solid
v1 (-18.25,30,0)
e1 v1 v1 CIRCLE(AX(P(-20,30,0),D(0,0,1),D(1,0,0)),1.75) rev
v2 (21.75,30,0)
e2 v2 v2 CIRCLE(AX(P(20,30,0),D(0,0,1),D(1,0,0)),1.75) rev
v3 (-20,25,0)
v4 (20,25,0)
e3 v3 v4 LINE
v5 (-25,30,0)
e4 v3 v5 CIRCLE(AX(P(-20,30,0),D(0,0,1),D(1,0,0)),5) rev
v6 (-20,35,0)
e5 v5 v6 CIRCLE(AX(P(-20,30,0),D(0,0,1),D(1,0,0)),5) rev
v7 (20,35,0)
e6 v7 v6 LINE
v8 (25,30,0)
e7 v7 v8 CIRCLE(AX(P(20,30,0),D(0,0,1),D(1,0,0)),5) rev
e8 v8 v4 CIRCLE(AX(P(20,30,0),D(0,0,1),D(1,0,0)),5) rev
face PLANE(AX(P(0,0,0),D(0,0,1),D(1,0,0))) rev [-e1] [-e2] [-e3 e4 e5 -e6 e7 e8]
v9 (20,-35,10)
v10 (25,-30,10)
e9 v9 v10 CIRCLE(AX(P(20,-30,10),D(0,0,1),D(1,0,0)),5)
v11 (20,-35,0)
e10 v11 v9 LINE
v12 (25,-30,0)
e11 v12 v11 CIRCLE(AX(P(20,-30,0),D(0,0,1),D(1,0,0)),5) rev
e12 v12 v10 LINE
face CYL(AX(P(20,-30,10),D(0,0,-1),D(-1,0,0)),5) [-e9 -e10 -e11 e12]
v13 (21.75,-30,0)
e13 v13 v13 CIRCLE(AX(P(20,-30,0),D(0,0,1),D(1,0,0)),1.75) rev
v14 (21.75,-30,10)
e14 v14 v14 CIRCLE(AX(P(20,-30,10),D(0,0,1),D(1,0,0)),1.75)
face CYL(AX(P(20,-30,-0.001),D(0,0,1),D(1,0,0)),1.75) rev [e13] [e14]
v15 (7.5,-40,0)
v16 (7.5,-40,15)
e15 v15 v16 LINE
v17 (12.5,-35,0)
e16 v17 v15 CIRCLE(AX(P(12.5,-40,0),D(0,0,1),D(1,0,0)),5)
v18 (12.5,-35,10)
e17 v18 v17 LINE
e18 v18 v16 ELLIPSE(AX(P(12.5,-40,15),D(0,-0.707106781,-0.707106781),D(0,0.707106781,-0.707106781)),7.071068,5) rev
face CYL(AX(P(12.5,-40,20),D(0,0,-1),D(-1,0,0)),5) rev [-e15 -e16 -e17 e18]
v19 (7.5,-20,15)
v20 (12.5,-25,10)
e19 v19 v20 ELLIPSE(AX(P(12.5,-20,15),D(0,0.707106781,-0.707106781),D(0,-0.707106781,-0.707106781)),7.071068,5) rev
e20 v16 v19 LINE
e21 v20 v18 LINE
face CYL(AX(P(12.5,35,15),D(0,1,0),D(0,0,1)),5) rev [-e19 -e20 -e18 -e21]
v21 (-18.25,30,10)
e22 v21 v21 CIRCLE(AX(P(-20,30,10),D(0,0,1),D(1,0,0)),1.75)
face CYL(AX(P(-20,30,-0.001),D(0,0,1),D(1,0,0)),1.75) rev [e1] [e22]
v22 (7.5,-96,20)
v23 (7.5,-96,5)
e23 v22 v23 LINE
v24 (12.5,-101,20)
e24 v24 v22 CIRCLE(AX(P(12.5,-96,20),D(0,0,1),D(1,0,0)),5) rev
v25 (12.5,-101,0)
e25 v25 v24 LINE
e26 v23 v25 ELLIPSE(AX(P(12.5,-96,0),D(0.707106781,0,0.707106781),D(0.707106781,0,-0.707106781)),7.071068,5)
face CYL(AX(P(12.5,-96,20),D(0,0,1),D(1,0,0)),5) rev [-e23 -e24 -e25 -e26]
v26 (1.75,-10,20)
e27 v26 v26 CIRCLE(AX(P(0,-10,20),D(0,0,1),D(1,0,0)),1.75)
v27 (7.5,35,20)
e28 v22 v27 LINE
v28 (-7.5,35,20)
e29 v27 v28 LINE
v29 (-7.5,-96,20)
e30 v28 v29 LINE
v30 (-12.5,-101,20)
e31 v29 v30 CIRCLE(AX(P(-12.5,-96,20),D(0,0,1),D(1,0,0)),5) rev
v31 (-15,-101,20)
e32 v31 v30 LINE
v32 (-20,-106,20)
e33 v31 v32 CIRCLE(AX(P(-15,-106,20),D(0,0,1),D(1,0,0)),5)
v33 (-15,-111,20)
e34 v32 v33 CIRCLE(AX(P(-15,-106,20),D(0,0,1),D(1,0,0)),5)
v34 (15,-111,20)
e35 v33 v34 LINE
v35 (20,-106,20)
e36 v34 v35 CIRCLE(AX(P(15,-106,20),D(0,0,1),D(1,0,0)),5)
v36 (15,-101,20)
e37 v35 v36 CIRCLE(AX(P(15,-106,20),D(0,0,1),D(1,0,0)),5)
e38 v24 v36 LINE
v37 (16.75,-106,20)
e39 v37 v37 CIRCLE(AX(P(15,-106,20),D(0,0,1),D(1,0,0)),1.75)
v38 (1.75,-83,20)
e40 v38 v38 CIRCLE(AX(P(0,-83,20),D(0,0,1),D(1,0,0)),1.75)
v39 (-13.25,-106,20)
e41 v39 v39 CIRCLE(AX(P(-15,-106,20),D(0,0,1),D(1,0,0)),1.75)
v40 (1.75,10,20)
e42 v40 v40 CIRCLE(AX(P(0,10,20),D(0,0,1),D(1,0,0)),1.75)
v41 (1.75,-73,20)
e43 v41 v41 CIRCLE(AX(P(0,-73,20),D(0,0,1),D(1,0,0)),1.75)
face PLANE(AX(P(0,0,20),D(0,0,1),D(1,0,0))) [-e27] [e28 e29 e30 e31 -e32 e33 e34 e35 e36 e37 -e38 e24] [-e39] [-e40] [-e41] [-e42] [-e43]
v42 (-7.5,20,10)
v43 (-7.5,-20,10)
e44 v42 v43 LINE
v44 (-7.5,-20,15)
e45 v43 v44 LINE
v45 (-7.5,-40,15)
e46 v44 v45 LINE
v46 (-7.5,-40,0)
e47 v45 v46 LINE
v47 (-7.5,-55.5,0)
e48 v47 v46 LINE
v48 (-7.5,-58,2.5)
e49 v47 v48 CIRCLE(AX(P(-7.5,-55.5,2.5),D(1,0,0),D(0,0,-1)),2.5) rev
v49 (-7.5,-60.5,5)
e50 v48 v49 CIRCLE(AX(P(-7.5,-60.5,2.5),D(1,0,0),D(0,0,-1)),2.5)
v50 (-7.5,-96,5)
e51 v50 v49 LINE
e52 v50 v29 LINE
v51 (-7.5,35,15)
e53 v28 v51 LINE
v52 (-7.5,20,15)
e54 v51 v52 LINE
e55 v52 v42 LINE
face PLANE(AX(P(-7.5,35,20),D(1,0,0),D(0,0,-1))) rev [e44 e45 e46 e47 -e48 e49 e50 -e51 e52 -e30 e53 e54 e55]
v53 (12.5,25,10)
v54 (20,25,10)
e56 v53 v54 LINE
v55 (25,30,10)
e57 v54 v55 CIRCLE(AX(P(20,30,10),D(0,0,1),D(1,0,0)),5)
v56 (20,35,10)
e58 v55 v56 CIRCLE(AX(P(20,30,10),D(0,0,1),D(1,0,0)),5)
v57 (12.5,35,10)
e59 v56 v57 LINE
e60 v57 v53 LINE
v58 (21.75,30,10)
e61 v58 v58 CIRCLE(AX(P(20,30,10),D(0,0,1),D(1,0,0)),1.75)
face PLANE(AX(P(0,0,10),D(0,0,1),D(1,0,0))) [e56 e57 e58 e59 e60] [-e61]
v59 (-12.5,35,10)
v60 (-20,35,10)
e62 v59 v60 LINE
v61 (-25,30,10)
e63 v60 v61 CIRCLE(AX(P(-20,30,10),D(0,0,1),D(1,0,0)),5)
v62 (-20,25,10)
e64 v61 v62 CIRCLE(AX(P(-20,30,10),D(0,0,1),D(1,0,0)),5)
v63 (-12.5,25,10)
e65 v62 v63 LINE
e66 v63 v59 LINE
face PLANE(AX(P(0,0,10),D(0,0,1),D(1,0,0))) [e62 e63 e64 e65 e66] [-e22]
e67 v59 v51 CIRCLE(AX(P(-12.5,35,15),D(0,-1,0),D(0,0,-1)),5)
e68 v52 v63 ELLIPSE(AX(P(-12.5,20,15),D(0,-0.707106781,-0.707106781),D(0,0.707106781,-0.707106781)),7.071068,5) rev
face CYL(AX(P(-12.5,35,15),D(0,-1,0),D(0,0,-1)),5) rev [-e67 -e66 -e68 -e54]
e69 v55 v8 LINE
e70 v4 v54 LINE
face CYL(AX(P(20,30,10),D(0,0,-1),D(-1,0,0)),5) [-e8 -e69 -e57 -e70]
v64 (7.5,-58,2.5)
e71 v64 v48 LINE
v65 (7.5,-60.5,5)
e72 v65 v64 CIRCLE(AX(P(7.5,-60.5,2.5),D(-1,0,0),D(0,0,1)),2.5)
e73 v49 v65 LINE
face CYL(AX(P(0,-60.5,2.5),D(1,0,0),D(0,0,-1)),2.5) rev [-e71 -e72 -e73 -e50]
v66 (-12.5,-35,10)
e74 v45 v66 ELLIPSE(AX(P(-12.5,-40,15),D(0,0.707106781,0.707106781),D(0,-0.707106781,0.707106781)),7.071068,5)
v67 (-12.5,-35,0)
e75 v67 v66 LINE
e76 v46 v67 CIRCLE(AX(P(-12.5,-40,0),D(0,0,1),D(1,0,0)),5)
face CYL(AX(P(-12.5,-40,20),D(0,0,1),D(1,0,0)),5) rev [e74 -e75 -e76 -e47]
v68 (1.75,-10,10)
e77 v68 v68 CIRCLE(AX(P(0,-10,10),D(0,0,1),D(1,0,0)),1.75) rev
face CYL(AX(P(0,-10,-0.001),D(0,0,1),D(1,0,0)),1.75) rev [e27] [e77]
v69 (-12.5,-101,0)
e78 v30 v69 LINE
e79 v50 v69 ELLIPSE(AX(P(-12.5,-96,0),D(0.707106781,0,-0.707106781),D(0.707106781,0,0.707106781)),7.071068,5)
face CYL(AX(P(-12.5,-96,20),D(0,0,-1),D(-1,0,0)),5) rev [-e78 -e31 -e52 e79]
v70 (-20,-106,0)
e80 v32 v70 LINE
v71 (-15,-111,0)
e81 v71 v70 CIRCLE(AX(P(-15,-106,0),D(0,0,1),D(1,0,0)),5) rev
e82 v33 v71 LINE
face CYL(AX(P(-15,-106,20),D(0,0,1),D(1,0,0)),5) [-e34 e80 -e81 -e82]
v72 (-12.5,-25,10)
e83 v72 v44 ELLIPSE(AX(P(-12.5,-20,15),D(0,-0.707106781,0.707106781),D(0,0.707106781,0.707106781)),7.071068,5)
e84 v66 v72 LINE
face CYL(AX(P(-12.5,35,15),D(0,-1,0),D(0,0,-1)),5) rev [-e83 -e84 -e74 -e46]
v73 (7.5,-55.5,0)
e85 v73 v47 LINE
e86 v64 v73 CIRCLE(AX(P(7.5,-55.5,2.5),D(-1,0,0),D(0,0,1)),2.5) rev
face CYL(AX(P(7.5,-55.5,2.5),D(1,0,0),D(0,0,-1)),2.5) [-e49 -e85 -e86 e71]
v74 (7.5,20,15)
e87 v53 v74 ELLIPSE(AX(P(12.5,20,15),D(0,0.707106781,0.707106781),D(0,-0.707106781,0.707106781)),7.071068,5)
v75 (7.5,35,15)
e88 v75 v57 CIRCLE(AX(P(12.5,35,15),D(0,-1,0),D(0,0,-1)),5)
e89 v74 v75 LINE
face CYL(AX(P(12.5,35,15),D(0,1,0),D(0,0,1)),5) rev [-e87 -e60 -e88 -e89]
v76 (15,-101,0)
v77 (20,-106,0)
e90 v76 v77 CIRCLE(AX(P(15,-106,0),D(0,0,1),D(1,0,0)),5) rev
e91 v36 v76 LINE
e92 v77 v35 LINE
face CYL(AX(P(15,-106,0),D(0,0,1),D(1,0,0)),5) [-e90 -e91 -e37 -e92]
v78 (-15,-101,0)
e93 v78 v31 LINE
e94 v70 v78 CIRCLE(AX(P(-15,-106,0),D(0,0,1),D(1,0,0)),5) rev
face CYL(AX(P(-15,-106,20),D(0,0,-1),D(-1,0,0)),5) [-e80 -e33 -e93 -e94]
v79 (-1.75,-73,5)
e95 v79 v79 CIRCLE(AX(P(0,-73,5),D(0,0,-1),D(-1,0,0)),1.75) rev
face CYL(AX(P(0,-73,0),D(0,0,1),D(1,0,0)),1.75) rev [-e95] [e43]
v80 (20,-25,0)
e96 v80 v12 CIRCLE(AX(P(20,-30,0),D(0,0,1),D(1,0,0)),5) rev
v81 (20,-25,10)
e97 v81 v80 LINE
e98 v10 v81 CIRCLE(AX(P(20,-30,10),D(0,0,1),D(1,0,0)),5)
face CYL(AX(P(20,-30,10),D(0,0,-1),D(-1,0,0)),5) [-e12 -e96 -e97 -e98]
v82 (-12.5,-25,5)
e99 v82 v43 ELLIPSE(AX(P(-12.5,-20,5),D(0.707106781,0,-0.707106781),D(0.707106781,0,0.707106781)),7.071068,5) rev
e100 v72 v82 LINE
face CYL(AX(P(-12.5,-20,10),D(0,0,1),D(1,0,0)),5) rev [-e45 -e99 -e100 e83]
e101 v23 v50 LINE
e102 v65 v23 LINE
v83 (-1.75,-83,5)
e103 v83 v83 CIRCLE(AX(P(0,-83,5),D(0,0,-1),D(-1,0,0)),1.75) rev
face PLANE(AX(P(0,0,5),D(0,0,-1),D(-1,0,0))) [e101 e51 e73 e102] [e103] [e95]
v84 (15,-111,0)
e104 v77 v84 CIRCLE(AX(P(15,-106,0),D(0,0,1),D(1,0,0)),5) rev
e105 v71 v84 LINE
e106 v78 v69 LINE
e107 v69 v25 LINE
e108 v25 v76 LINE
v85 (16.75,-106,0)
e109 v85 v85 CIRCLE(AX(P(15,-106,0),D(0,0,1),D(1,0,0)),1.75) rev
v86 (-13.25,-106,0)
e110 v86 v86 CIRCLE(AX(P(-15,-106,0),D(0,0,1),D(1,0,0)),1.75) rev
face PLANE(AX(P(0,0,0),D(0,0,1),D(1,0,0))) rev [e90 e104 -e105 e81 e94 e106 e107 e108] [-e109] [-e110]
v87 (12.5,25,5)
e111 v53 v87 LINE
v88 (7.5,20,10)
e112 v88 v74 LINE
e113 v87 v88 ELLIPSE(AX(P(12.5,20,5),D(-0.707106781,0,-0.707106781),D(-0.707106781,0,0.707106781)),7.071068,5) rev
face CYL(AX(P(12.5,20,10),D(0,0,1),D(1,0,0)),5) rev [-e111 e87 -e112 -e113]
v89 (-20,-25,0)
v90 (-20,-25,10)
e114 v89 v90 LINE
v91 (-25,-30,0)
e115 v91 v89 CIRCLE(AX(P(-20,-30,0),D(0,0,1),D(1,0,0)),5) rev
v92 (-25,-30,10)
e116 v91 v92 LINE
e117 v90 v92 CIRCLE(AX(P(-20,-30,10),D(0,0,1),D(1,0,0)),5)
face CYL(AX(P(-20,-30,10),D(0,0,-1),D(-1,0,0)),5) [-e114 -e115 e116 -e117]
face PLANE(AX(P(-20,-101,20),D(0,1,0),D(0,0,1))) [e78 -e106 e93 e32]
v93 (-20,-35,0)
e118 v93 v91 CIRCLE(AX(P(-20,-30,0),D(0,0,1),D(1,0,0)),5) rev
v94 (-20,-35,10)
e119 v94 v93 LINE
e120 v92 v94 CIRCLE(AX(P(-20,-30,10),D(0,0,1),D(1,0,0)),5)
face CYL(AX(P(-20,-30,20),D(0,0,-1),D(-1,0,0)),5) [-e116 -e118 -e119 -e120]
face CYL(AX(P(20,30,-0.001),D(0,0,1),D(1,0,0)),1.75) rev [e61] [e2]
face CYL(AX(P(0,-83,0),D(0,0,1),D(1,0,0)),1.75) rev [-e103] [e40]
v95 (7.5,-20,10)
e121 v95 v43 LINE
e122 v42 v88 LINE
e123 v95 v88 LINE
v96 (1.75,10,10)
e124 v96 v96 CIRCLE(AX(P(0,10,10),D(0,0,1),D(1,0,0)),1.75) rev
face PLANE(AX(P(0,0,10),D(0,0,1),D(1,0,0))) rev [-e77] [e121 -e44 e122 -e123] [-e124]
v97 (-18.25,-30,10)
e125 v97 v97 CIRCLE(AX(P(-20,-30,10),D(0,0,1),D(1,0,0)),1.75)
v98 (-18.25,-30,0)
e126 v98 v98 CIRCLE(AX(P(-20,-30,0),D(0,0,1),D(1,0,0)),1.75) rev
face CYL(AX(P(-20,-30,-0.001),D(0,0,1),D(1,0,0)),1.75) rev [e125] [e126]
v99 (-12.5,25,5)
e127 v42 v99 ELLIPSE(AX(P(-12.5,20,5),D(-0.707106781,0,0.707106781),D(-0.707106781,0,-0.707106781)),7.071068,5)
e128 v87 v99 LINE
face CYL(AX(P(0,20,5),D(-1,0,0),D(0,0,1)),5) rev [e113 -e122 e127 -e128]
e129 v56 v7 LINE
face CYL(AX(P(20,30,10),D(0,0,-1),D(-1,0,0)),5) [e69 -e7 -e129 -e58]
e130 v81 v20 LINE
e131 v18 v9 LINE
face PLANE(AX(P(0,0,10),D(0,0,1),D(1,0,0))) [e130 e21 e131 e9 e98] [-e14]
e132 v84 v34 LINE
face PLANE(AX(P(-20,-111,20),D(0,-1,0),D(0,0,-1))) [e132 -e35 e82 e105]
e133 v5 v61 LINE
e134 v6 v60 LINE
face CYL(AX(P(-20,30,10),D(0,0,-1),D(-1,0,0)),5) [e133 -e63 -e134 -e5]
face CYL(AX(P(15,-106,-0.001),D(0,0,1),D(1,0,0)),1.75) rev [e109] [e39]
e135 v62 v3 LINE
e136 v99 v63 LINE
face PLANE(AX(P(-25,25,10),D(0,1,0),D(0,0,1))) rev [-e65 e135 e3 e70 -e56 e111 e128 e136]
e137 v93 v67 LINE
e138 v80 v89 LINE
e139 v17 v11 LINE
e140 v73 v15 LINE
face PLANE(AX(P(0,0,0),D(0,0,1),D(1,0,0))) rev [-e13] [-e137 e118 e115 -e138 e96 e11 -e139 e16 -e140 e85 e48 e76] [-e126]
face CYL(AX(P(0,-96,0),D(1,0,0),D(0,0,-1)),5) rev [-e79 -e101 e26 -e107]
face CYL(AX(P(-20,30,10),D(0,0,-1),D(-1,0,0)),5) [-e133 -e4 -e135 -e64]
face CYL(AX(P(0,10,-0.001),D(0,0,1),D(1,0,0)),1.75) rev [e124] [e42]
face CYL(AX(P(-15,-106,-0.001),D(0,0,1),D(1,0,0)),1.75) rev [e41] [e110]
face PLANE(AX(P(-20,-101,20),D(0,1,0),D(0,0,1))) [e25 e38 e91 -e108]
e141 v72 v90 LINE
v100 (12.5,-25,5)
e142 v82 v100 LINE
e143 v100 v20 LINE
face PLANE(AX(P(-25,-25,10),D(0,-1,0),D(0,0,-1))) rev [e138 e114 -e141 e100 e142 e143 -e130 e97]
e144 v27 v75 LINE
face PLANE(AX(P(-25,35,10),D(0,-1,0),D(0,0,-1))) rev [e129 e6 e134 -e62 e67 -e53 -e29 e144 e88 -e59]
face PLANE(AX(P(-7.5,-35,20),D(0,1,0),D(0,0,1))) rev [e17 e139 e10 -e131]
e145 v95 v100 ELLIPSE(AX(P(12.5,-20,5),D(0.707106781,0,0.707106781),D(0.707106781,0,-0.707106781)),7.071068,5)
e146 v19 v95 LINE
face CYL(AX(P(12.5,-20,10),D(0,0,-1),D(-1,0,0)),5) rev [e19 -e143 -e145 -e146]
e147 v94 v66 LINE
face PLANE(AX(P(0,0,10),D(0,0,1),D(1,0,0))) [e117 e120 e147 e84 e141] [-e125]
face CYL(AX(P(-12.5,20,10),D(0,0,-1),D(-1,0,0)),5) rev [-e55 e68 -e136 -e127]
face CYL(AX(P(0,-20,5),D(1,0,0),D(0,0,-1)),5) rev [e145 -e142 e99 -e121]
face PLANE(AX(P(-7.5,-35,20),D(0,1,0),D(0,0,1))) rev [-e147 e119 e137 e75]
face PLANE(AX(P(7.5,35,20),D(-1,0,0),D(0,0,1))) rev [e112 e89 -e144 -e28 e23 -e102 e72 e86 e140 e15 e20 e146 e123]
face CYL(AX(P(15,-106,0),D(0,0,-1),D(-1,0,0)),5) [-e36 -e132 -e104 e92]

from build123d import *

# Parameters (mm, degrees)
SKETCH1_W                = 50
SKETCH1_H                = 10
BOSS_EXTRUDE1_DEPTH      = 10
BOSS_EXTRUDE1_2_DEPTH    = 10
SKETCH2_W                = 15
SKETCH2_H                = 70
BOSS_EXTRUDE2_DEPTH      = 10
CUT_EXTRUDE1_REACH       = 49.434
SKETCH3_R                = 1.75
CUT_EXTRUDE2_REACH       = 46.159
SKETCH4_R                = 1.75
FILLET2_R                = 5
FILLET4_R                = 5
FILLET5_R                = 5
FILLET6_R                = 5
SKETCH5_W                = 15
SKETCH5_H                = 20
BOSS_EXTRUDE3_DEPTH      = 66
BOSS_EXTRUDE4_DEPTH      = 20
BOSS_EXTRUDE4_DEPTH_BACK = 20
SKETCH6_W                = 20
SKETCH6_H                = 10
CUT_EXTRUDE3_REACH       = 117.525
SKETCH7_R                = 1.75
FILLET7_R                = 5
FILLET9_R                = 5
FILLET10_R               = 5
SKETCH8_R                = 1.75
CUT_EXTRUDE4_DEPTH       = 116.524889093
SKETCH11_W               = 15
SKETCH11_H               = 43
CUT_EXTRUDE5_DEPTH       = 5
FILLET11_R               = 5
FILLET13_R               = 2.5


# Some blends are built 0.0001 mm under size
with BuildPart() as part:
    # Sketch1 → Boss-Extrude1 (new body)
    with BuildSketch(Plane.XY):
        with Locations((0, 30)):
            Rectangle(SKETCH1_W, SKETCH1_H)
    extrude(amount=BOSS_EXTRUDE1_DEPTH)



with BuildPart() as body_2:
    # Sketch1 → Boss-Extrude1 2 (new body)
    with BuildSketch(Plane.XY):
        with Locations((0, -30)):
            Rectangle(SKETCH1_W, SKETCH1_H)
    extrude(amount=BOSS_EXTRUDE1_2_DEPTH)


with BuildPart() as part_1:
    add(part.part)

    add(body_2.part)  # Boss-Extrude2 merges body 2
    # Sketch2 → Boss-Extrude2 (add)
    with BuildSketch(Plane.XY.offset(10)):
        Rectangle(SKETCH2_W, SKETCH2_H)
    extrude(amount=BOSS_EXTRUDE2_DEPTH)

    # Sketch3 → Cut-Extrude1 (cut, up to next)
    with BuildSketch(Plane.XY.offset(20), mode=Mode.PRIVATE) as cut_extrude1_sk1:
        with Locations((0, 10)):
            Circle(SKETCH3_R)
    cut_extrude1_tool1 = extrude(cut_extrude1_sk1.sketch, amount=-CUT_EXTRUDE1_REACH, mode=Mode.PRIVATE) & part_1.part
    # Sketch3 → Cut-Extrude1 (cut, up to next)
    with BuildSketch(Plane.XY.offset(20), mode=Mode.PRIVATE) as cut_extrude1_sk2:
        with Locations((0, -10)):
            Circle(SKETCH3_R)
    cut_extrude1_tool2 = extrude(cut_extrude1_sk2.sketch, amount=-CUT_EXTRUDE1_REACH, mode=Mode.PRIVATE) & part_1.part
    add(cut_extrude1_tool1.solids().sort_by_distance((0, 10, 20))[0], mode=Mode.SUBTRACT)
    add(cut_extrude1_tool2.solids().sort_by_distance((0, -10, 20))[0], mode=Mode.SUBTRACT)

    # Sketch4 → Cut-Extrude2 (cut, up to next)
    with BuildSketch(Plane.XY.offset(10), mode=Mode.PRIVATE) as cut_extrude2_sk1:
        with Locations((-20, 30)):
            Circle(SKETCH4_R)
    cut_extrude2_tool1 = extrude(cut_extrude2_sk1.sketch, amount=-CUT_EXTRUDE2_REACH, mode=Mode.PRIVATE) & part_1.part
    # Sketch4 → Cut-Extrude2 (cut, up to next)
    with BuildSketch(Plane.XY.offset(10), mode=Mode.PRIVATE) as cut_extrude2_sk2:
        with Locations((-20, -30)):
            Circle(SKETCH4_R)
    cut_extrude2_tool2 = extrude(cut_extrude2_sk2.sketch, amount=-CUT_EXTRUDE2_REACH, mode=Mode.PRIVATE) & part_1.part
    # Sketch4 → Cut-Extrude2 (cut, up to next)
    with BuildSketch(Plane.XY.offset(10), mode=Mode.PRIVATE) as cut_extrude2_sk3:
        with Locations((20, 30)):
            Circle(SKETCH4_R)
    cut_extrude2_tool3 = extrude(cut_extrude2_sk3.sketch, amount=-CUT_EXTRUDE2_REACH, mode=Mode.PRIVATE) & part_1.part
    # Sketch4 → Cut-Extrude2 (cut, up to next)
    with BuildSketch(Plane.XY.offset(10), mode=Mode.PRIVATE) as cut_extrude2_sk4:
        with Locations((20, -30)):
            Circle(SKETCH4_R)
    cut_extrude2_tool4 = extrude(cut_extrude2_sk4.sketch, amount=-CUT_EXTRUDE2_REACH, mode=Mode.PRIVATE) & part_1.part
    add(cut_extrude2_tool1.solids().sort_by_distance((-20, 30, 10))[0], mode=Mode.SUBTRACT)
    add(cut_extrude2_tool2.solids().sort_by_distance((-20, -30, 10))[0], mode=Mode.SUBTRACT)
    add(cut_extrude2_tool3.solids().sort_by_distance((20, 30, 10))[0], mode=Mode.SUBTRACT)
    add(cut_extrude2_tool4.solids().sort_by_distance((20, -30, 10))[0], mode=Mode.SUBTRACT)

    # Fillet2
    fillet2_edges = [part_1.edges().sort_by_distance(p)[0] for p in [
        (25, -35, 5),
        (25, -25, 5),
        (25, 35, 5),
        (25, 25, 5),
        (-25, 35, 5),
        (-25, 25, 5),
        (-25, -25, 5),
        (-25, -35, 5),
    ]]
    fillet(fillet2_edges, radius=FILLET2_R - 0.0001)  # a hair under: the kernel refuses the full size

    # Fillet4
    # the kernel refuses this fillet: 5 mm, written as the material it adds along each edge
    with BuildSketch(Plane(origin=(7.5, 25, 10), x_dir=(0, 0, -1), z_dir=(-1, 0, 0))) as fillet4_piece_1:
        with BuildLine():
            CenterArc((FILLET4_R, FILLET4_R), FILLET4_R, 180, 90)
            Line((0, FILLET4_R), (0, 0))
            Line((0, 0), (FILLET4_R, 0))
        make_face()
    extrude(amount=15)
    with BuildSketch(Plane(origin=(-7.5, -25, 10), x_dir=(0, 1, 0), z_dir=(1, 0, 0))) as fillet4_piece_2:
        with BuildLine():
            CenterArc((FILLET4_R, -FILLET4_R), FILLET4_R, 90, 90)
            Line((0, -FILLET4_R), (0, 0))
            Line((0, 0), (FILLET4_R, 0))
        make_face()
    extrude(amount=15)

    # Fillet5
    fillet5_edges = [part_1.edges().sort_by_distance(p)[0] for p in [
        (7.5, -25, 7.5),
        (7.5, 25, 7.5),
    ]]
    fillet(fillet5_edges, radius=FILLET5_R - 0.0001)  # a hair under: the kernel refuses the full size

    # Fillet6
    fillet6_edges = [part_1.edges().sort_by_distance(p)[0] for p in [
        (-7.5, -25, 7.5),
        (-7.5, 25, 7.5),
    ]]
    fillet(fillet6_edges, radius=FILLET6_R - 0.0001)  # a hair under: the kernel refuses the full size

    # Sketch5 → Boss-Extrude3 (add)
    with BuildSketch(Plane.XZ.offset(35)):
        with Locations((0, 10)):
            Rectangle(SKETCH5_W, SKETCH5_H)
    extrude(amount=BOSS_EXTRUDE3_DEPTH)

    # Sketch6 → Boss-Extrude4 (add, two sides: drawn at the far end of the back side and taken through both)
    with BuildSketch(Plane(origin=(0, 0, 0), x_dir=(0, 0, -1), z_dir=(1, 0, 0)).offset(-BOSS_EXTRUDE4_DEPTH_BACK)):
        with Locations((-10, -106)):
            Rectangle(SKETCH6_W, SKETCH6_H)
    extrude(amount=BOSS_EXTRUDE4_DEPTH + BOSS_EXTRUDE4_DEPTH_BACK)

    # Sketch7 → Cut-Extrude3 (cut, up to next)
    with BuildSketch(Plane.XY.offset(20), mode=Mode.PRIVATE) as cut_extrude3_sk1:
        with Locations((-15, -106)):
            Circle(SKETCH7_R)
    cut_extrude3_tool1 = extrude(cut_extrude3_sk1.sketch, amount=-CUT_EXTRUDE3_REACH, mode=Mode.PRIVATE) & part_1.part
    # Sketch7 → Cut-Extrude3 (cut, up to next)
    with BuildSketch(Plane.XY.offset(20), mode=Mode.PRIVATE) as cut_extrude3_sk2:
        with Locations((15, -106)):
            Circle(SKETCH7_R)
    cut_extrude3_tool2 = extrude(cut_extrude3_sk2.sketch, amount=-CUT_EXTRUDE3_REACH, mode=Mode.PRIVATE) & part_1.part
    add(cut_extrude3_tool1.solids().sort_by_distance((-15, -106, 20))[0], mode=Mode.SUBTRACT)
    add(cut_extrude3_tool2.solids().sort_by_distance((15, -106, 20))[0], mode=Mode.SUBTRACT)

    # Fillet7
    fillet7_edges = [part_1.edges().sort_by_distance(p)[0] for p in [
        (20, -111, 10),
        (20, -101, 10),
        (-20, -111, 10),
        (-20, -101, 10),
    ]]
    fillet(fillet7_edges, radius=FILLET7_R - 0.0001)  # a hair under: the kernel refuses the full size

    # Fillet9
    fillet9_edges = [part_1.edges().sort_by_distance(p)[0] for p in [
        (-7.5, -35, 5),
        (7.5, -35, 5),
    ]]
    fillet(fillet9_edges, radius=FILLET9_R)

    # Fillet10
    fillet10_edges = [part_1.edges().sort_by_distance(p)[0] for p in [
        (7.5, -30.00005, 10),
        (7.5, 27.50005, 10),
        (-7.5, -30.00005, 10),
        (-7.5, 27.50005, 10),
    ]]
    fillet(fillet10_edges, radius=FILLET10_R)

    # Sketch8 → Cut-Extrude4 (cut, through all)
    with BuildSketch(Plane.XY.offset(20)):
        with Locations((0, -73)):
            Circle(SKETCH8_R)
        with Locations((0, -83)):
            Circle(SKETCH8_R)
    extrude(amount=-CUT_EXTRUDE4_DEPTH, mode=Mode.SUBTRACT)

    # Sketch11 → Cut-Extrude5 (cut)
    with BuildSketch(Plane(origin=(0, 0, 0), x_dir=(-1, 0, 0), z_dir=(0, 0, -1))):
        with Locations((0, -79.5)):
            Rectangle(SKETCH11_W, SKETCH11_H)
    extrude(amount=-CUT_EXTRUDE5_DEPTH, mode=Mode.SUBTRACT)

    # Fillet11
    fillet11_edges = [part_1.edges().sort_by_distance(p)[0] for p in [
        (-7.5, -101, 12.5),
        (7.5, -101, 12.5),
        (0, -101, 5),
    ]]
    fillet(fillet11_edges, radius=FILLET11_R - 0.0001)  # a hair under: the kernel refuses the full size

    # Fillet13
    fillet13_edges = [part_1.edges().sort_by_distance(p)[0] for p in [
        (0, -58, 5),
    ]]
    fillet(fillet13_edges, radius=FILLET13_R)
    fillet13_2_edges = [part_1.edges().sort_by_distance(p)[0] for p in [
        (0, -58, 0),
    ]]
    fillet(fillet13_2_edges, radius=FILLET13_R - 0.0001)  # a hair under: the kernel refuses the full size


solid = part_1.part
